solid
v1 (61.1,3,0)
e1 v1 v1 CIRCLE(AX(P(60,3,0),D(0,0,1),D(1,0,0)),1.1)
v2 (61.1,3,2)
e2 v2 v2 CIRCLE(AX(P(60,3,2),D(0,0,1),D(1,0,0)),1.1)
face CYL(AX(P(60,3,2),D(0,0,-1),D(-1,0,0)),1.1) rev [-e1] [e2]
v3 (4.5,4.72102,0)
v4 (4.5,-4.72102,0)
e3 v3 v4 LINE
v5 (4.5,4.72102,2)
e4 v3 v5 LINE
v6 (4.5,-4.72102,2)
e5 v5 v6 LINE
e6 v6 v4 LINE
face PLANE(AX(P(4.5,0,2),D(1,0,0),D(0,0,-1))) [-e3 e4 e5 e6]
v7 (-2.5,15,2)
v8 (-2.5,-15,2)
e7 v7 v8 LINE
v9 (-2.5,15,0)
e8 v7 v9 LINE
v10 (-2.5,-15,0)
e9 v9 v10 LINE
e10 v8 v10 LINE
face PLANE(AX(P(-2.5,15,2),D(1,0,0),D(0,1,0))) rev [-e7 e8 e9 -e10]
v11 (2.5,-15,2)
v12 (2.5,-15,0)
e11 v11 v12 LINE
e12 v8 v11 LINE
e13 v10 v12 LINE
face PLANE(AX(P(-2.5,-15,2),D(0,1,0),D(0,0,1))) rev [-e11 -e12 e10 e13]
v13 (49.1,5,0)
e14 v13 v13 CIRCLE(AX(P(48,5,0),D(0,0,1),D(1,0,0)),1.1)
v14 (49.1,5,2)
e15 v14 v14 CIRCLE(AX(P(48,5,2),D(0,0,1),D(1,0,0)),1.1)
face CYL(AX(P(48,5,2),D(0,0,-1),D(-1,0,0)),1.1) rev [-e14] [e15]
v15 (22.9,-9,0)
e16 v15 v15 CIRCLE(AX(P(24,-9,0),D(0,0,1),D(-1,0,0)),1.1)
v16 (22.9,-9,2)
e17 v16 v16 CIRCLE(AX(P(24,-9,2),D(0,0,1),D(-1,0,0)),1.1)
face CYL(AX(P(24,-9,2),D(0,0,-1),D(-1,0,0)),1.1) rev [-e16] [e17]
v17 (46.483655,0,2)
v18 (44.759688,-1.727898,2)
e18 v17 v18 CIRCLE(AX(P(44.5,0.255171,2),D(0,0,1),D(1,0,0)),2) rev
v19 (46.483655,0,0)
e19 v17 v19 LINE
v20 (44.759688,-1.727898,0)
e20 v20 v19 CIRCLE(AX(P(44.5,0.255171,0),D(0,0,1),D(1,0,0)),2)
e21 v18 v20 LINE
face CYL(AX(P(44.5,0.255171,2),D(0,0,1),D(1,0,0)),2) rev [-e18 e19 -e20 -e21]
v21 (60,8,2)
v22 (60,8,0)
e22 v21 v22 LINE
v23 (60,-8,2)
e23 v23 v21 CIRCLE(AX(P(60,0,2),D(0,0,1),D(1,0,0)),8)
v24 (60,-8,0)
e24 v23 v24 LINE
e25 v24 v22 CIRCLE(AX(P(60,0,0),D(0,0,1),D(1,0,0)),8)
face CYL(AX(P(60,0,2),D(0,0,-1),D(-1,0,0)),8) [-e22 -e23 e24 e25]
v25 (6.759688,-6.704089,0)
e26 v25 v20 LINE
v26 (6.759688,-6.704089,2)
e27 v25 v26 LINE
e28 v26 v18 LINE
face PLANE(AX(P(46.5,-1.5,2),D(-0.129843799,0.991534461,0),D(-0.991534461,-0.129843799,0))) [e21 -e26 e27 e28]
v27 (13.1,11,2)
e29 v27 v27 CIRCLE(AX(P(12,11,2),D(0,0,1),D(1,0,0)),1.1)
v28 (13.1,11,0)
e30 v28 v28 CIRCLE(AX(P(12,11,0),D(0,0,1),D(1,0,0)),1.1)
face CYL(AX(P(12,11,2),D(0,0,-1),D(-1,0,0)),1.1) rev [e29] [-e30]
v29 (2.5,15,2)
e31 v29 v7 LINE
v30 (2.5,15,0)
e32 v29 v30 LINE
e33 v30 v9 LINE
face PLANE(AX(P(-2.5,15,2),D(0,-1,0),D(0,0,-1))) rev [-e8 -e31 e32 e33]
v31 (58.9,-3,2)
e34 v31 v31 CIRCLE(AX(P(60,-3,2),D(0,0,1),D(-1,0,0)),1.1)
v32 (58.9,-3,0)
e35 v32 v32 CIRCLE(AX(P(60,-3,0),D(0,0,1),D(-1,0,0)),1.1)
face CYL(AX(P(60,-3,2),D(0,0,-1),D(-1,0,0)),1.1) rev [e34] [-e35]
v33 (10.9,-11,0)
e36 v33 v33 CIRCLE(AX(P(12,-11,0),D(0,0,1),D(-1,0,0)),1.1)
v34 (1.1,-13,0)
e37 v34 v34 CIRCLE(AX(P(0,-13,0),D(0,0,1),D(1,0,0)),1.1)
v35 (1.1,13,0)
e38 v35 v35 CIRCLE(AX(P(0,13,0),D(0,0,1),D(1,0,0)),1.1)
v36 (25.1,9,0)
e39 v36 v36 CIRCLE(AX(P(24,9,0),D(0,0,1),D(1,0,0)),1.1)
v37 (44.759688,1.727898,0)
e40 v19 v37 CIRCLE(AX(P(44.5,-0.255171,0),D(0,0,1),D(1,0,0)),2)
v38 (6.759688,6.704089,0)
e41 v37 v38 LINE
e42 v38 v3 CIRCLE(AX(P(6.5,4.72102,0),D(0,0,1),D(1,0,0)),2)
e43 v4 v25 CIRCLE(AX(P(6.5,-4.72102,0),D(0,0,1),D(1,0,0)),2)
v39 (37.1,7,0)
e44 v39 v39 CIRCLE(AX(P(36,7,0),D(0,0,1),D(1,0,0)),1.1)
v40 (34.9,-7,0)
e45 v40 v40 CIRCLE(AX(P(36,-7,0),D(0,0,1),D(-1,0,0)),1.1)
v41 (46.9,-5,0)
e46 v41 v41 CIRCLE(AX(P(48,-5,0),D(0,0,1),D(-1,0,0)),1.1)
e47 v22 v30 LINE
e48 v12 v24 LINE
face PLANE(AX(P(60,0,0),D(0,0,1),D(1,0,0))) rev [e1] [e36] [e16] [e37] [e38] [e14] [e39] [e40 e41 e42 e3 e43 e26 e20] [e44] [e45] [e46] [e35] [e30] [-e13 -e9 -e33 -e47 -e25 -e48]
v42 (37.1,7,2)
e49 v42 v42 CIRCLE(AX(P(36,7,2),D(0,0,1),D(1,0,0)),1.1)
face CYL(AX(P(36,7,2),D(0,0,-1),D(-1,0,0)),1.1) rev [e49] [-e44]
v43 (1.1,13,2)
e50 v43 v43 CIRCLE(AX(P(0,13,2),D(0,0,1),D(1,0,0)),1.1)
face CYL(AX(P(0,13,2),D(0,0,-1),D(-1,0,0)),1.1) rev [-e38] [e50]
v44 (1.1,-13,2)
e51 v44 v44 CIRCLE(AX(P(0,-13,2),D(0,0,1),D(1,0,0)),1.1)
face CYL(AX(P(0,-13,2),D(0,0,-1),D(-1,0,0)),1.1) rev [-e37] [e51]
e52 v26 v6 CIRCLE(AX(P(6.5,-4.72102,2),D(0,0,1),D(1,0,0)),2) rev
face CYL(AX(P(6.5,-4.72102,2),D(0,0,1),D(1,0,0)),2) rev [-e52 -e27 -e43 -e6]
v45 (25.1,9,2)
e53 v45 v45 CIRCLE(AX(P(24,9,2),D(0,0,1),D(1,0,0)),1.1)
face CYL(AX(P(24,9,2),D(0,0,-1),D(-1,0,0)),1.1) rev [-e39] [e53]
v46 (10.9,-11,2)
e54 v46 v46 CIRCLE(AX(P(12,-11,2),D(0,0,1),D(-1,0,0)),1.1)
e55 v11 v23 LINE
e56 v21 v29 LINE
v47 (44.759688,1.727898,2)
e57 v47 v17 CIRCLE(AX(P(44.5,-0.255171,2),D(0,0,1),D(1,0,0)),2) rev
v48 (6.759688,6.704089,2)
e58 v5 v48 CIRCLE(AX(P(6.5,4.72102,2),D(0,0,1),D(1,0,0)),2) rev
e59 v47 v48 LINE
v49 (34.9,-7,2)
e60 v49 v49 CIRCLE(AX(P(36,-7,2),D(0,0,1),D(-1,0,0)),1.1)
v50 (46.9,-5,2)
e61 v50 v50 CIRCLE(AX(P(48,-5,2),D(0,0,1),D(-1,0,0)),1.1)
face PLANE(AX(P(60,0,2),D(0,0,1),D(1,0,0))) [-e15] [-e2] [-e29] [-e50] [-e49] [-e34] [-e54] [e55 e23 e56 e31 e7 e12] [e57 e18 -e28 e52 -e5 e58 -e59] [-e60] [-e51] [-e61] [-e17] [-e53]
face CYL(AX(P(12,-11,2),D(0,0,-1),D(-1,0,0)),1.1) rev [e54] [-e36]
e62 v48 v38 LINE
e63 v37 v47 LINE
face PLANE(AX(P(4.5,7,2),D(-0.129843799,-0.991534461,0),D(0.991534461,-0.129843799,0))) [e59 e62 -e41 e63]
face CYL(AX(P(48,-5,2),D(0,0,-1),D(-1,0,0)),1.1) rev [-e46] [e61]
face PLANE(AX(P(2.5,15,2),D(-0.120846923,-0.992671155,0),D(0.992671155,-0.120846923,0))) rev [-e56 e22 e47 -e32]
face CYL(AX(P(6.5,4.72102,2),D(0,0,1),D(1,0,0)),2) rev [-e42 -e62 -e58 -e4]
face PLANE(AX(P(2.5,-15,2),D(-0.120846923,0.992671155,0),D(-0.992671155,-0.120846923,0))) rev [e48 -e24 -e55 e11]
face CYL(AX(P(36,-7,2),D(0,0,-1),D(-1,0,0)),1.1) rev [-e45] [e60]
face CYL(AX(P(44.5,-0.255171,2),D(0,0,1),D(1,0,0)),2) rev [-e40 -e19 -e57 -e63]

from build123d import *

# Parameters (mm, degrees)
SKETCH_1_R      = 1.1
EXTRUDE_1_DEPTH = 2
FILLET_1_R      = 2


with BuildPart() as part:
    # 草圖1 → 填料-伸長1 (new body)
    with BuildSketch(Plane.XY):
        with BuildLine():
            Line((2.5, 15), (60, 8))
            ThreePointArc((60, 8), (68, 0), (60, -8))
            Line((60, -8), (2.5, -15))
            Line((2.5, -15), (-2.5, -15))
            Line((-2.5, -15), (-2.5, 15))
            Line((-2.5, 15), (2.5, 15))
        make_face()
        with Locations((0, 13)):
            Circle(SKETCH_1_R, mode=Mode.SUBTRACT)
        with Locations((0, -13)):
            Circle(SKETCH_1_R, mode=Mode.SUBTRACT)
        with Locations((12, 11)):
            Circle(SKETCH_1_R, mode=Mode.SUBTRACT)
        with Locations((24, 9)):
            Circle(SKETCH_1_R, mode=Mode.SUBTRACT)
        with Locations((36, 7)):
            Circle(SKETCH_1_R, mode=Mode.SUBTRACT)
        with Locations((48, 5)):
            Circle(SKETCH_1_R, mode=Mode.SUBTRACT)
        with Locations((60, 3)):
            Circle(SKETCH_1_R, mode=Mode.SUBTRACT)
        with Locations(Location((60, -3, 0), (0, 0, 180))):
            Circle(SKETCH_1_R, mode=Mode.SUBTRACT)
        with Locations(Location((48, -5, 0), (0, 0, 180))):
            Circle(SKETCH_1_R, mode=Mode.SUBTRACT)
        with Locations(Location((36, -7, 0), (0, 0, 180))):
            Circle(SKETCH_1_R, mode=Mode.SUBTRACT)
        with Locations(Location((24, -9, 0), (0, 0, 180))):
            Circle(SKETCH_1_R, mode=Mode.SUBTRACT)
        with Locations(Location((12, -11, 0), (0, 0, 180))):
            Circle(SKETCH_1_R, mode=Mode.SUBTRACT)
        Polygon((4.5, 0), (4.5, 7), (46.5, 1.5), (46.5, -1.5), (4.5, -7), align=None, mode=Mode.SUBTRACT)
    extrude(amount=EXTRUDE_1_DEPTH)

    # 圓角1
    # the kernel refuses this fillet: 2 mm, written as the material it adds along each edge
    with BuildSketch(Plane(origin=(46.5, -1.5, 0), x_dir=(0, 1, 0), z_dir=(0, 0, 1)), Plane(origin=(46.5, 1.5, 0), x_dir=(-0.9915344613221523, 0.12984379850647185, 0), z_dir=(0, 0, 1))) as fillet_1_piece_1:
        with BuildLine():
            CenterArc((FILLET_1_R * 0.877585434936, FILLET_1_R), FILLET_1_R, 187.460566126, 82.539433874)
            Line((-FILLET_1_R * 0.113949026386, FILLET_1_R * 0.870156201494), (0, 0))
            Line((0, 0), (FILLET_1_R * 0.877585434936, 0))
        make_face()
    extrude(amount=2)
    with BuildSketch(Plane(origin=(4.5, -7, 0), x_dir=(0, 1, 0), z_dir=(0, 0, 1))) as fillet_1_piece_2:
        with BuildLine():
            CenterArc((FILLET_1_R * 1.13949019684, -FILLET_1_R), FILLET_1_R, 90, 97.460566126)
            Line((FILLET_1_R * 0.147955735519, -FILLET_1_R * 1.12984379851), (0, 0))
            Line((0, 0), (FILLET_1_R * 1.13949019684, 0))
        make_face()
    extrude(amount=2)
    with BuildSketch(Plane(origin=(4.5, 7, 0), x_dir=(0, -1, 0), z_dir=(0, 0, 1))) as fillet_1_piece_3:
        with BuildLine():
            CenterArc((FILLET_1_R * 1.13949019684, FILLET_1_R), FILLET_1_R, 172.539433874, 97.460566126)
            Line((FILLET_1_R * 0.147955735519, FILLET_1_R * 1.12984379851), (0, 0))
            Line((0, 0), (FILLET_1_R * 1.13949019684, 0))
        make_face()
    extrude(amount=2)


solid = part.part
